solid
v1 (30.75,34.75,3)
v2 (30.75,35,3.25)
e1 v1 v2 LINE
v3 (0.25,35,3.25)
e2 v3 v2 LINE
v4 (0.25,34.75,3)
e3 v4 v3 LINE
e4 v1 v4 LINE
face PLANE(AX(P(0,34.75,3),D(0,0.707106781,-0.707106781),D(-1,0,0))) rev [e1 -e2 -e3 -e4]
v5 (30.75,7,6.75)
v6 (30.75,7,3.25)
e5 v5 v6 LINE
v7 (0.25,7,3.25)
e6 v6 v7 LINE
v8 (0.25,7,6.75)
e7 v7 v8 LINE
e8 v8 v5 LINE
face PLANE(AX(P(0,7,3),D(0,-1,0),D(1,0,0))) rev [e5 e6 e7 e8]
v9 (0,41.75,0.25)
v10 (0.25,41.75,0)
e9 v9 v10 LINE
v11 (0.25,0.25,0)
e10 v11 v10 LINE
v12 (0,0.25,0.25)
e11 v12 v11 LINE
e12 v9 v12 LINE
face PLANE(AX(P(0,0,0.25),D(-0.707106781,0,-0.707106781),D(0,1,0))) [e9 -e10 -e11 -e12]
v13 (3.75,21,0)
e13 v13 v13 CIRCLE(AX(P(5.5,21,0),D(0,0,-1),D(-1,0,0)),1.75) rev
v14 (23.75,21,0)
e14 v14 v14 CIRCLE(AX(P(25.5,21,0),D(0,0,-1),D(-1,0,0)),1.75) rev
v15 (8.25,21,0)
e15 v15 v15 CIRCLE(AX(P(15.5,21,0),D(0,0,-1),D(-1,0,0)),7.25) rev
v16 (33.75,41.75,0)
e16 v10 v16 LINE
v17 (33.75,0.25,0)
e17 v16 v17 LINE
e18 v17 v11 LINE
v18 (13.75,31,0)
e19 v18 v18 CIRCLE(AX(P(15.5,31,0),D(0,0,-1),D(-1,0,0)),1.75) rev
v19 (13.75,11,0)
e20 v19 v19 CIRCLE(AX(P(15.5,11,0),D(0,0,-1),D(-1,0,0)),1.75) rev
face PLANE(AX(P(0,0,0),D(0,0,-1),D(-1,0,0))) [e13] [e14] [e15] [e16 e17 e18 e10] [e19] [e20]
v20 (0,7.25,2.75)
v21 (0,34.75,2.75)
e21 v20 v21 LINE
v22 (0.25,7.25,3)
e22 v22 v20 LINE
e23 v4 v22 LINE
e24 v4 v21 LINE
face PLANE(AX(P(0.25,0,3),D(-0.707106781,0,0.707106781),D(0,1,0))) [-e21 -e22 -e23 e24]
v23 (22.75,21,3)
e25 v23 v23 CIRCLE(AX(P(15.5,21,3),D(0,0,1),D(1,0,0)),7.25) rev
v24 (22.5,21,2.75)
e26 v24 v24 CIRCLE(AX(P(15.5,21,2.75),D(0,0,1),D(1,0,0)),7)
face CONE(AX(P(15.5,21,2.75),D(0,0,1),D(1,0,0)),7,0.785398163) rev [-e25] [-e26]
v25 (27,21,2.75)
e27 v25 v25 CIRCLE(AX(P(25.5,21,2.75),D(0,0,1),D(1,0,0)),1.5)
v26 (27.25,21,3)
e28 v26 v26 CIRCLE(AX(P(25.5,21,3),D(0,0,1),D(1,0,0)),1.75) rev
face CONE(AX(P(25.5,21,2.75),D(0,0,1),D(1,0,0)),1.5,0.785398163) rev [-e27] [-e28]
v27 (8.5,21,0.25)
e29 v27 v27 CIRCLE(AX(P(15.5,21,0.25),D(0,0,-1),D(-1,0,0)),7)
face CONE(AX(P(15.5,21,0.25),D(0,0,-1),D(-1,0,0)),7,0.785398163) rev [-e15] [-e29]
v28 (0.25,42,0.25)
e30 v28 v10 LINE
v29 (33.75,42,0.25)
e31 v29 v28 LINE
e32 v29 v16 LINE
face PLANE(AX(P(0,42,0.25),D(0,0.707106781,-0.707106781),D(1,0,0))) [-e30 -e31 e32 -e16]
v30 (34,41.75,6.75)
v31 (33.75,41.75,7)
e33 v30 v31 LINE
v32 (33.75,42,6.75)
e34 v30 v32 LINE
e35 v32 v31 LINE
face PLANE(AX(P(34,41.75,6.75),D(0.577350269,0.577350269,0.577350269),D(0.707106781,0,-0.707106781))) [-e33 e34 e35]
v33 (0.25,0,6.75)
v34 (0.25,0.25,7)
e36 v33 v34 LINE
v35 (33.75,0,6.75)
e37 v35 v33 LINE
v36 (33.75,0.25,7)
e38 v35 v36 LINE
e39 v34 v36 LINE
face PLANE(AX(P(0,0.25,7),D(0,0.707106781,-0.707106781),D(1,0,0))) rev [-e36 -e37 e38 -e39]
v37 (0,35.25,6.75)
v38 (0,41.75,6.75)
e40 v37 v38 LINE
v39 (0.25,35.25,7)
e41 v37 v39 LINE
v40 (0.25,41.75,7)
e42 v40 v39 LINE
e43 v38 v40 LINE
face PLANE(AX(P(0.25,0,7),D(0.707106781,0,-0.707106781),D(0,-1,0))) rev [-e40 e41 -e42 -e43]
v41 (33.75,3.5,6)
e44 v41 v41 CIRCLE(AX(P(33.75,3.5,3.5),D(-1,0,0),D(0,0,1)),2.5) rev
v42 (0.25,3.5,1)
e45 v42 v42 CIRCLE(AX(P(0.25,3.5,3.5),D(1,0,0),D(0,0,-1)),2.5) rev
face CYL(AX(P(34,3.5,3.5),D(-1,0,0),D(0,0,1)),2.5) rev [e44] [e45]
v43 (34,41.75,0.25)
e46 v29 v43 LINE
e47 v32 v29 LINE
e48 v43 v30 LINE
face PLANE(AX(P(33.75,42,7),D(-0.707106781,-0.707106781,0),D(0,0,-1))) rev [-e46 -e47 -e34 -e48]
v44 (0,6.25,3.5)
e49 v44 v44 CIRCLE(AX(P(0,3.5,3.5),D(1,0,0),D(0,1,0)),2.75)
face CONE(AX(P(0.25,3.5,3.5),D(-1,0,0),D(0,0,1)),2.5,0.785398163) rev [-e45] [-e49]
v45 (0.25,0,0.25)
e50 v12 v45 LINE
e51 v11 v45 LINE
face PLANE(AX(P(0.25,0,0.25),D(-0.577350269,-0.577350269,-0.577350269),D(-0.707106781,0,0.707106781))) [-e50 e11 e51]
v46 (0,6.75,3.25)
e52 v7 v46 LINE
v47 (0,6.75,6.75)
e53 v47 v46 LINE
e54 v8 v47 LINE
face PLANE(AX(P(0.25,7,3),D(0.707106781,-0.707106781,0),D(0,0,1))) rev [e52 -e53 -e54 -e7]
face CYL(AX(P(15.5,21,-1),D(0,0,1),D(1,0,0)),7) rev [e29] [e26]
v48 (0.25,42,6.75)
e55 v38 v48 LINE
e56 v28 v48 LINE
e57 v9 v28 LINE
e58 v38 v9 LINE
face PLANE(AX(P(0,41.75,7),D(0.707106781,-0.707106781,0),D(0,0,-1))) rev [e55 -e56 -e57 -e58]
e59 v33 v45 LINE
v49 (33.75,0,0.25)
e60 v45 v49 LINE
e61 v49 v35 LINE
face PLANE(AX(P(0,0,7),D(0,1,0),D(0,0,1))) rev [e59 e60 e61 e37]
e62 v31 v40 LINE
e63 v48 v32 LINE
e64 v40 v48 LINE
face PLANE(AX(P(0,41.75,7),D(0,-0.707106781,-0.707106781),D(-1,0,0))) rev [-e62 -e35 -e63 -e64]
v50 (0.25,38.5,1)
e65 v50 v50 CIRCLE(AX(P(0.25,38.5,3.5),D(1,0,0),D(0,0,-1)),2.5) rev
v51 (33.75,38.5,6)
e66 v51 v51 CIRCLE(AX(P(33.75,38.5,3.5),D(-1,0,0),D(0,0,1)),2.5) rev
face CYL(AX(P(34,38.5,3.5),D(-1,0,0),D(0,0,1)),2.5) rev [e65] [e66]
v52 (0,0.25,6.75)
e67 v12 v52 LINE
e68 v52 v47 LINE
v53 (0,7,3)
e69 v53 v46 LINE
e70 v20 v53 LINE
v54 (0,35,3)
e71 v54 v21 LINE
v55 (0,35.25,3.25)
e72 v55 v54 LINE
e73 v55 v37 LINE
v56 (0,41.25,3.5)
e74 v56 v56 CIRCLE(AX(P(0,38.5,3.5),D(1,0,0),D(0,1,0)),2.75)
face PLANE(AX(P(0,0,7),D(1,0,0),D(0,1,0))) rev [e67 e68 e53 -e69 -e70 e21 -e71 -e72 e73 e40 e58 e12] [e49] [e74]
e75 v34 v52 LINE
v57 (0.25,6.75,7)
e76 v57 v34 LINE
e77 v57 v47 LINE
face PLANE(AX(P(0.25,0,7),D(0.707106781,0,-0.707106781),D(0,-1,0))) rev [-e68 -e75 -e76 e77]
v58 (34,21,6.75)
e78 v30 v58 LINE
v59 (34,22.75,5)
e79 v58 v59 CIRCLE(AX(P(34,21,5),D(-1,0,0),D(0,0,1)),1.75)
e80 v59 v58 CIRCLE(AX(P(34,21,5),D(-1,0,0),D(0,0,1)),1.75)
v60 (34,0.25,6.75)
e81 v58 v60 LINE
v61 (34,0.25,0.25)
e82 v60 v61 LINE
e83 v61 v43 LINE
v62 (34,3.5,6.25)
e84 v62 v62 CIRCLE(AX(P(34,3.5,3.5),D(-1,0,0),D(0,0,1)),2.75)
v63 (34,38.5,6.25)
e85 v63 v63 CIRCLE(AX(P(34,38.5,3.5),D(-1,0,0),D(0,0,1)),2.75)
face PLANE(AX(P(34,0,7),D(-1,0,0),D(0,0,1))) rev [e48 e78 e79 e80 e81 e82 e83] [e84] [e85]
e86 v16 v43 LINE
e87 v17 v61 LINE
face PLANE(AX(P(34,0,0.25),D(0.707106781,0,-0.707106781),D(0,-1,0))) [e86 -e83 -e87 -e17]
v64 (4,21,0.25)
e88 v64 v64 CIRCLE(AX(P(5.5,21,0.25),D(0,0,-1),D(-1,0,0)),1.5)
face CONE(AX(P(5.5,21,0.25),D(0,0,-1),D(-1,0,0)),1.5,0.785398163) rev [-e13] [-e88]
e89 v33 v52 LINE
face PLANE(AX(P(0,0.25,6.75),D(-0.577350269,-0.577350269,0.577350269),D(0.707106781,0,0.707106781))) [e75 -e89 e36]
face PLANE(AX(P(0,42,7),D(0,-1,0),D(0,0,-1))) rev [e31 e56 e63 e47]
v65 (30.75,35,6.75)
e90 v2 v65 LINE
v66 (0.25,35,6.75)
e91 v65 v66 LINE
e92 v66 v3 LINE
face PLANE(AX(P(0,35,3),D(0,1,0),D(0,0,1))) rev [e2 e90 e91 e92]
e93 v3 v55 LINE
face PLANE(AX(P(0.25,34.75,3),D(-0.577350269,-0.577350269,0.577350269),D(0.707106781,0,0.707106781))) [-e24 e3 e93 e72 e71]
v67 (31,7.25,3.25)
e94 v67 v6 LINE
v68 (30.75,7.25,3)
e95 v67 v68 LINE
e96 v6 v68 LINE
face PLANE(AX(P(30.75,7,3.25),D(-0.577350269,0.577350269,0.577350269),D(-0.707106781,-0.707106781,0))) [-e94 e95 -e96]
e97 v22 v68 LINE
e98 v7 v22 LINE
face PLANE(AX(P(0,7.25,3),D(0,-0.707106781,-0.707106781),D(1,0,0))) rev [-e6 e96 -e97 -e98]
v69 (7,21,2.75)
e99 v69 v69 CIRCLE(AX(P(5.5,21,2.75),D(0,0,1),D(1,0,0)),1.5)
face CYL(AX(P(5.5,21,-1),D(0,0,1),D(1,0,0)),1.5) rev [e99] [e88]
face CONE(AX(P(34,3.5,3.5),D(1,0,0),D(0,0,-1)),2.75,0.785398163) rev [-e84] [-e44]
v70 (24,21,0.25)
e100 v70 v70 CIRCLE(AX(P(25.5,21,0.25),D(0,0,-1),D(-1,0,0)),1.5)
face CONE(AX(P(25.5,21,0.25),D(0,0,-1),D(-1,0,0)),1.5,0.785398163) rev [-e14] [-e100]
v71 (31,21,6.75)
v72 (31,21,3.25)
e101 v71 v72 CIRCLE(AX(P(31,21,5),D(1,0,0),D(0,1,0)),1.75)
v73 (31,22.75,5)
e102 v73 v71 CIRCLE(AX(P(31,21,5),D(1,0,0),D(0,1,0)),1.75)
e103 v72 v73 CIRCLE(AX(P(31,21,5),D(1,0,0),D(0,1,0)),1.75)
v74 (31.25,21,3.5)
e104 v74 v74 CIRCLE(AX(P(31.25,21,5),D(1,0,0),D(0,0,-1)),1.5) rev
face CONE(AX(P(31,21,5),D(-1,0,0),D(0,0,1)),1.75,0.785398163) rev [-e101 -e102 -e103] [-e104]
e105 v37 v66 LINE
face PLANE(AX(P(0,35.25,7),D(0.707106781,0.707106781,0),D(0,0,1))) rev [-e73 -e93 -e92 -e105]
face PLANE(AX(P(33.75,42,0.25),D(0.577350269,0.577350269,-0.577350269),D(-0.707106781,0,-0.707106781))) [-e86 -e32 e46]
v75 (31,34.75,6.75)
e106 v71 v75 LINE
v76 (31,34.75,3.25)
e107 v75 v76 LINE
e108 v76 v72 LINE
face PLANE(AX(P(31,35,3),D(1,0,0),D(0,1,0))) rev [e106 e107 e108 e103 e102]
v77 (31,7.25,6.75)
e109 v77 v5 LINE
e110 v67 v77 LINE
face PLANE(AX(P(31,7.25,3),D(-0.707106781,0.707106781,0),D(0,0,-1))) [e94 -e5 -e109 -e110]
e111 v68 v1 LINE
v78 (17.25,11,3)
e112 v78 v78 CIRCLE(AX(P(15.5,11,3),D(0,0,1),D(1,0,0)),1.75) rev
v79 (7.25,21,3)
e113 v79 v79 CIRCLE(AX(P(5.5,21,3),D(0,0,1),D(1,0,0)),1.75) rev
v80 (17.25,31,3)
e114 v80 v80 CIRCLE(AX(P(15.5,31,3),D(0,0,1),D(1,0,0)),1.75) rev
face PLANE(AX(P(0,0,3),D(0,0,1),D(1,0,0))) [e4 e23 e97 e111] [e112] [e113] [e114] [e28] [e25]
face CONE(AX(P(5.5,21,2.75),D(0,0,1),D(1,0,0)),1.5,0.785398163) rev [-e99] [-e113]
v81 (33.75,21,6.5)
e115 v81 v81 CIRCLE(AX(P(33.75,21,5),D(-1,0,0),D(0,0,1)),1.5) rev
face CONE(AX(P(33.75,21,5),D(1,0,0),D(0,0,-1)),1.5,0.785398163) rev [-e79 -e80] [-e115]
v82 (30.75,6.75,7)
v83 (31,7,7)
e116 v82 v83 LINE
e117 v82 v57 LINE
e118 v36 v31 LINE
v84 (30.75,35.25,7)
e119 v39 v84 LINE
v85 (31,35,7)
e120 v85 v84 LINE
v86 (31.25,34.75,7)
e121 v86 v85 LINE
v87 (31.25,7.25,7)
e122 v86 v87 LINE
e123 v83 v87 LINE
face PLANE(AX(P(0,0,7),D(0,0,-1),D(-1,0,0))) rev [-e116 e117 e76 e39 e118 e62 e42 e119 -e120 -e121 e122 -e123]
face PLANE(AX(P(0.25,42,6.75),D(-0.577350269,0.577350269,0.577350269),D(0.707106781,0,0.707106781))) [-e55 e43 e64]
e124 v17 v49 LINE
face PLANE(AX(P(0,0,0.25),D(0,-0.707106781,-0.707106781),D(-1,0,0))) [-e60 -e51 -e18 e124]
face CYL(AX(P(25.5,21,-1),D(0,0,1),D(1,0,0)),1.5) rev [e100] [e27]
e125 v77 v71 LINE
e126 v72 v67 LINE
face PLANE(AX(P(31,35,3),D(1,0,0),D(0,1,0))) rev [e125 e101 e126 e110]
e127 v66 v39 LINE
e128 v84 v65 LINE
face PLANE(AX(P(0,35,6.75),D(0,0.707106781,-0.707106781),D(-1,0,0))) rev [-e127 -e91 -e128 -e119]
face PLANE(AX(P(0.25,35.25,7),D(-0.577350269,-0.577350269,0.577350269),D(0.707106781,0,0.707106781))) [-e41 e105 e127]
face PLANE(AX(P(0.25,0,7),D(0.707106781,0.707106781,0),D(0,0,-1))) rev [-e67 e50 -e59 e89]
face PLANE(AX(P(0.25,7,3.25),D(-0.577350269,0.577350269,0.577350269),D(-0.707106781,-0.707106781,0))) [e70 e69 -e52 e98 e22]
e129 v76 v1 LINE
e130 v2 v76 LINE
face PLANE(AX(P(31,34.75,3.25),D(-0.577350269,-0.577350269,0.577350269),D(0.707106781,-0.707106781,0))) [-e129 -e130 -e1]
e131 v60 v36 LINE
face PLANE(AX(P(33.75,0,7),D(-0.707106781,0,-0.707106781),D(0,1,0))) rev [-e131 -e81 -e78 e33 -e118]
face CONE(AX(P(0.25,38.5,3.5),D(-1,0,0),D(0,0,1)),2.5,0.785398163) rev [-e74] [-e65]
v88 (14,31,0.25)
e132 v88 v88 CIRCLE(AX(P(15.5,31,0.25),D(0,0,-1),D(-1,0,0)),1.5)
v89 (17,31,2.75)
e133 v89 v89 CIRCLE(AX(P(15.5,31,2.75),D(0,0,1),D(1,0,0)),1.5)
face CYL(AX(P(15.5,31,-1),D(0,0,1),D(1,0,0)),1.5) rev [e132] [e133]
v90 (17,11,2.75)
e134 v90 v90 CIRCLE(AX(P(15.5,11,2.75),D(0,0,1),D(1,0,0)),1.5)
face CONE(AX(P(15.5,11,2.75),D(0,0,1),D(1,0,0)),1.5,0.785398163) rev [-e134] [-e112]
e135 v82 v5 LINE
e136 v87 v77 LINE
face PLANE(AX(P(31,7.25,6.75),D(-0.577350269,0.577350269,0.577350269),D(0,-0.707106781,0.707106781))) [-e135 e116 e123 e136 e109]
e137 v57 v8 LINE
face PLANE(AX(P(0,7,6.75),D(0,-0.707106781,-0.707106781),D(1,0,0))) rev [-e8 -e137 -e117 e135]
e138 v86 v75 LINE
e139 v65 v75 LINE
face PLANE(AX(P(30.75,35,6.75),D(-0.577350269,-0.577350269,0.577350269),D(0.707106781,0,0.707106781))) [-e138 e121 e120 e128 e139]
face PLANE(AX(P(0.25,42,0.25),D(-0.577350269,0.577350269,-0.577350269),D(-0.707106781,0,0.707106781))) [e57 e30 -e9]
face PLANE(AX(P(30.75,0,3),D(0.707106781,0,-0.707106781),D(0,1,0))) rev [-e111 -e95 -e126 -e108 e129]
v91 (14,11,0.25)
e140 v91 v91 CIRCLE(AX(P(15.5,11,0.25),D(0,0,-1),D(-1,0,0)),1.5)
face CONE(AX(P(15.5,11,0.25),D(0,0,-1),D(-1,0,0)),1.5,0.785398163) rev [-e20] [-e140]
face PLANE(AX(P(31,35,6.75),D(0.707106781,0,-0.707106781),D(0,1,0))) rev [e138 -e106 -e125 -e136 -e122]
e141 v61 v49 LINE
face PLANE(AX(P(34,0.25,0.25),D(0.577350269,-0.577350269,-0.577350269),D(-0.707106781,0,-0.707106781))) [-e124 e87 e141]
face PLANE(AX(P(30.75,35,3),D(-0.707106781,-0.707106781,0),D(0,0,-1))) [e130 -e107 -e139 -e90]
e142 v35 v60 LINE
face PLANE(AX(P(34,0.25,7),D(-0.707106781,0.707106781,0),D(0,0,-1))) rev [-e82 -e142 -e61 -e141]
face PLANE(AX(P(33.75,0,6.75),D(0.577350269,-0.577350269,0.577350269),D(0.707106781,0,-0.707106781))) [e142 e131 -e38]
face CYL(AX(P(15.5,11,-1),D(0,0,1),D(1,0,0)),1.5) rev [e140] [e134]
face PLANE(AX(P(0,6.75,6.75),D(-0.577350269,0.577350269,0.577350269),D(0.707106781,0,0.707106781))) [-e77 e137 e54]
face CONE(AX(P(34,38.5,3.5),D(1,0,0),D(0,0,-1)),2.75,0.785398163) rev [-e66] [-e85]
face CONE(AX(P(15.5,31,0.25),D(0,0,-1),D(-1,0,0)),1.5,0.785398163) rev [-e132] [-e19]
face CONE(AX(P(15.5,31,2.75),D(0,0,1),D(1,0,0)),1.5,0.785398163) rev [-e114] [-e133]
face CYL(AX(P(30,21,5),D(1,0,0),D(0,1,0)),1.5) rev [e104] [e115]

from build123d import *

# Parameters (mm, degrees)
ESQUISSE1_W             = 34
ESQUISSE1_H             = 42
BOSS_EXTRU_1_DEPTH      = 7
ESQUISSE2_W             = 31
ESQUISSE2_H             = 28
ENL_V_MAT_EXTRU_1_DEPTH = 4
ESQUISSE3_R             = 2.5
ENL_V_MAT_EXTRU_2_DEPTH = 55.488530903
ESQUISSE4_R             = 7
ESQUISSE4_R_2           = 1.5
ENL_V_MAT_EXTRU_3_DEPTH = 4
ESQUISSE5_R             = 1.5
ENL_V_MAT_EXTRU_4_DEPTH = 4
CHANFREIN2_SIZE         = 0.25


with BuildPart() as part:
    # Esquisse1 → Boss.-Extru.1 (new body)
    with BuildSketch(Plane.XY):
        with Locations((17, 21)):
            Rectangle(ESQUISSE1_W, ESQUISSE1_H)
    extrude(amount=BOSS_EXTRU_1_DEPTH)

    # Esquisse2 → Enlèv. mat.-Extru.1 (cut)
    with BuildSketch(Plane.XY.offset(7)):
        with Locations((15.5, 21)):
            Rectangle(ESQUISSE2_W, ESQUISSE2_H)
    extrude(amount=-ENL_V_MAT_EXTRU_1_DEPTH, mode=Mode.SUBTRACT)

    # Esquisse3 → Enlèv. mat.-Extru.2 (cut, through all)
    with BuildSketch(Plane.ZY):
        with Locations((3.5, 38.5)):
            Circle(ESQUISSE3_R)
        with Locations((3.5, 3.5)):
            Circle(ESQUISSE3_R)
    extrude(amount=-ENL_V_MAT_EXTRU_2_DEPTH, mode=Mode.SUBTRACT)

    # Esquisse4 → Enlèv. mat.-Extru.3 (cut)
    with BuildSketch(Plane.XY.offset(3)):
        with Locations((15.5, 21)):
            Circle(ESQUISSE4_R)
        with Locations((15.5, 31)):
            Circle(ESQUISSE4_R_2)
        with Locations((15.5, 11)):
            Circle(ESQUISSE4_R_2)
        with Locations((25.5, 21)):
            Circle(ESQUISSE4_R_2)
        with Locations((5.5, 21)):
            Circle(ESQUISSE4_R_2)
    extrude(amount=-ENL_V_MAT_EXTRU_3_DEPTH, mode=Mode.SUBTRACT)

    # Esquisse5 → Enlèv. mat.-Extru.4 (cut)
    with BuildSketch(Plane(origin=(34, 0, 0), x_dir=(0, 0, -1), z_dir=(1, 0, 0))):
        with Locations(Location((-5, 21, 0), (0, 0, 90))):
            Circle(ESQUISSE5_R)
    extrude(amount=-ENL_V_MAT_EXTRU_4_DEPTH, mode=Mode.SUBTRACT)

    # Chanfrein2
    chanfrein2_edges = [part.edges().sort_by_distance(p)[0] for p in [
        (34, 21, 7),
        (17, 42, 7),
        (0, 3.5, 7),
        (0, 21, 3),
        (0, 7, 5),
        (15.5, 35, 3),
        (0, 35, 5),
        (31, 21, 3),
        (31, 35, 5),
        (15.5, 7, 3),
        (31, 7, 5),
        (15.5, 7, 7),
        (31, 21, 7),
        (15.5, 35, 7),
        (34, 38.5, 1),
        (0, 38.5, 1),
        (34, 3.5, 1),
        (0, 3.5, 1),
        (0, 38.5, 7),
        (14, 31, 0),
        (14, 31, 3),
        (17, 42, 0),
        (14, 11, 0),
        (14, 11, 3),
        (24, 21, 0),
        (24, 21, 3),
        (34, 21, 0),
        (4, 21, 0),
        (4, 21, 3),
        (8.5, 21, 0),
        (8.5, 21, 3),
        (17, 0, 0),
        (0, 21, 0),
        (31, 19.5, 5),
        (34, 19.5, 5),
        (17, 0, 7),
        (0, 42, 3.5),
        (34, 42, 3.5),
        (34, 0, 3.5),
        (0, 0, 3.5),
    ]]
    chamfer(chanfrein2_edges, length=CHANFREIN2_SIZE - 0.0001)  # a hair under: the kernel refuses the full size


solid = part.part
